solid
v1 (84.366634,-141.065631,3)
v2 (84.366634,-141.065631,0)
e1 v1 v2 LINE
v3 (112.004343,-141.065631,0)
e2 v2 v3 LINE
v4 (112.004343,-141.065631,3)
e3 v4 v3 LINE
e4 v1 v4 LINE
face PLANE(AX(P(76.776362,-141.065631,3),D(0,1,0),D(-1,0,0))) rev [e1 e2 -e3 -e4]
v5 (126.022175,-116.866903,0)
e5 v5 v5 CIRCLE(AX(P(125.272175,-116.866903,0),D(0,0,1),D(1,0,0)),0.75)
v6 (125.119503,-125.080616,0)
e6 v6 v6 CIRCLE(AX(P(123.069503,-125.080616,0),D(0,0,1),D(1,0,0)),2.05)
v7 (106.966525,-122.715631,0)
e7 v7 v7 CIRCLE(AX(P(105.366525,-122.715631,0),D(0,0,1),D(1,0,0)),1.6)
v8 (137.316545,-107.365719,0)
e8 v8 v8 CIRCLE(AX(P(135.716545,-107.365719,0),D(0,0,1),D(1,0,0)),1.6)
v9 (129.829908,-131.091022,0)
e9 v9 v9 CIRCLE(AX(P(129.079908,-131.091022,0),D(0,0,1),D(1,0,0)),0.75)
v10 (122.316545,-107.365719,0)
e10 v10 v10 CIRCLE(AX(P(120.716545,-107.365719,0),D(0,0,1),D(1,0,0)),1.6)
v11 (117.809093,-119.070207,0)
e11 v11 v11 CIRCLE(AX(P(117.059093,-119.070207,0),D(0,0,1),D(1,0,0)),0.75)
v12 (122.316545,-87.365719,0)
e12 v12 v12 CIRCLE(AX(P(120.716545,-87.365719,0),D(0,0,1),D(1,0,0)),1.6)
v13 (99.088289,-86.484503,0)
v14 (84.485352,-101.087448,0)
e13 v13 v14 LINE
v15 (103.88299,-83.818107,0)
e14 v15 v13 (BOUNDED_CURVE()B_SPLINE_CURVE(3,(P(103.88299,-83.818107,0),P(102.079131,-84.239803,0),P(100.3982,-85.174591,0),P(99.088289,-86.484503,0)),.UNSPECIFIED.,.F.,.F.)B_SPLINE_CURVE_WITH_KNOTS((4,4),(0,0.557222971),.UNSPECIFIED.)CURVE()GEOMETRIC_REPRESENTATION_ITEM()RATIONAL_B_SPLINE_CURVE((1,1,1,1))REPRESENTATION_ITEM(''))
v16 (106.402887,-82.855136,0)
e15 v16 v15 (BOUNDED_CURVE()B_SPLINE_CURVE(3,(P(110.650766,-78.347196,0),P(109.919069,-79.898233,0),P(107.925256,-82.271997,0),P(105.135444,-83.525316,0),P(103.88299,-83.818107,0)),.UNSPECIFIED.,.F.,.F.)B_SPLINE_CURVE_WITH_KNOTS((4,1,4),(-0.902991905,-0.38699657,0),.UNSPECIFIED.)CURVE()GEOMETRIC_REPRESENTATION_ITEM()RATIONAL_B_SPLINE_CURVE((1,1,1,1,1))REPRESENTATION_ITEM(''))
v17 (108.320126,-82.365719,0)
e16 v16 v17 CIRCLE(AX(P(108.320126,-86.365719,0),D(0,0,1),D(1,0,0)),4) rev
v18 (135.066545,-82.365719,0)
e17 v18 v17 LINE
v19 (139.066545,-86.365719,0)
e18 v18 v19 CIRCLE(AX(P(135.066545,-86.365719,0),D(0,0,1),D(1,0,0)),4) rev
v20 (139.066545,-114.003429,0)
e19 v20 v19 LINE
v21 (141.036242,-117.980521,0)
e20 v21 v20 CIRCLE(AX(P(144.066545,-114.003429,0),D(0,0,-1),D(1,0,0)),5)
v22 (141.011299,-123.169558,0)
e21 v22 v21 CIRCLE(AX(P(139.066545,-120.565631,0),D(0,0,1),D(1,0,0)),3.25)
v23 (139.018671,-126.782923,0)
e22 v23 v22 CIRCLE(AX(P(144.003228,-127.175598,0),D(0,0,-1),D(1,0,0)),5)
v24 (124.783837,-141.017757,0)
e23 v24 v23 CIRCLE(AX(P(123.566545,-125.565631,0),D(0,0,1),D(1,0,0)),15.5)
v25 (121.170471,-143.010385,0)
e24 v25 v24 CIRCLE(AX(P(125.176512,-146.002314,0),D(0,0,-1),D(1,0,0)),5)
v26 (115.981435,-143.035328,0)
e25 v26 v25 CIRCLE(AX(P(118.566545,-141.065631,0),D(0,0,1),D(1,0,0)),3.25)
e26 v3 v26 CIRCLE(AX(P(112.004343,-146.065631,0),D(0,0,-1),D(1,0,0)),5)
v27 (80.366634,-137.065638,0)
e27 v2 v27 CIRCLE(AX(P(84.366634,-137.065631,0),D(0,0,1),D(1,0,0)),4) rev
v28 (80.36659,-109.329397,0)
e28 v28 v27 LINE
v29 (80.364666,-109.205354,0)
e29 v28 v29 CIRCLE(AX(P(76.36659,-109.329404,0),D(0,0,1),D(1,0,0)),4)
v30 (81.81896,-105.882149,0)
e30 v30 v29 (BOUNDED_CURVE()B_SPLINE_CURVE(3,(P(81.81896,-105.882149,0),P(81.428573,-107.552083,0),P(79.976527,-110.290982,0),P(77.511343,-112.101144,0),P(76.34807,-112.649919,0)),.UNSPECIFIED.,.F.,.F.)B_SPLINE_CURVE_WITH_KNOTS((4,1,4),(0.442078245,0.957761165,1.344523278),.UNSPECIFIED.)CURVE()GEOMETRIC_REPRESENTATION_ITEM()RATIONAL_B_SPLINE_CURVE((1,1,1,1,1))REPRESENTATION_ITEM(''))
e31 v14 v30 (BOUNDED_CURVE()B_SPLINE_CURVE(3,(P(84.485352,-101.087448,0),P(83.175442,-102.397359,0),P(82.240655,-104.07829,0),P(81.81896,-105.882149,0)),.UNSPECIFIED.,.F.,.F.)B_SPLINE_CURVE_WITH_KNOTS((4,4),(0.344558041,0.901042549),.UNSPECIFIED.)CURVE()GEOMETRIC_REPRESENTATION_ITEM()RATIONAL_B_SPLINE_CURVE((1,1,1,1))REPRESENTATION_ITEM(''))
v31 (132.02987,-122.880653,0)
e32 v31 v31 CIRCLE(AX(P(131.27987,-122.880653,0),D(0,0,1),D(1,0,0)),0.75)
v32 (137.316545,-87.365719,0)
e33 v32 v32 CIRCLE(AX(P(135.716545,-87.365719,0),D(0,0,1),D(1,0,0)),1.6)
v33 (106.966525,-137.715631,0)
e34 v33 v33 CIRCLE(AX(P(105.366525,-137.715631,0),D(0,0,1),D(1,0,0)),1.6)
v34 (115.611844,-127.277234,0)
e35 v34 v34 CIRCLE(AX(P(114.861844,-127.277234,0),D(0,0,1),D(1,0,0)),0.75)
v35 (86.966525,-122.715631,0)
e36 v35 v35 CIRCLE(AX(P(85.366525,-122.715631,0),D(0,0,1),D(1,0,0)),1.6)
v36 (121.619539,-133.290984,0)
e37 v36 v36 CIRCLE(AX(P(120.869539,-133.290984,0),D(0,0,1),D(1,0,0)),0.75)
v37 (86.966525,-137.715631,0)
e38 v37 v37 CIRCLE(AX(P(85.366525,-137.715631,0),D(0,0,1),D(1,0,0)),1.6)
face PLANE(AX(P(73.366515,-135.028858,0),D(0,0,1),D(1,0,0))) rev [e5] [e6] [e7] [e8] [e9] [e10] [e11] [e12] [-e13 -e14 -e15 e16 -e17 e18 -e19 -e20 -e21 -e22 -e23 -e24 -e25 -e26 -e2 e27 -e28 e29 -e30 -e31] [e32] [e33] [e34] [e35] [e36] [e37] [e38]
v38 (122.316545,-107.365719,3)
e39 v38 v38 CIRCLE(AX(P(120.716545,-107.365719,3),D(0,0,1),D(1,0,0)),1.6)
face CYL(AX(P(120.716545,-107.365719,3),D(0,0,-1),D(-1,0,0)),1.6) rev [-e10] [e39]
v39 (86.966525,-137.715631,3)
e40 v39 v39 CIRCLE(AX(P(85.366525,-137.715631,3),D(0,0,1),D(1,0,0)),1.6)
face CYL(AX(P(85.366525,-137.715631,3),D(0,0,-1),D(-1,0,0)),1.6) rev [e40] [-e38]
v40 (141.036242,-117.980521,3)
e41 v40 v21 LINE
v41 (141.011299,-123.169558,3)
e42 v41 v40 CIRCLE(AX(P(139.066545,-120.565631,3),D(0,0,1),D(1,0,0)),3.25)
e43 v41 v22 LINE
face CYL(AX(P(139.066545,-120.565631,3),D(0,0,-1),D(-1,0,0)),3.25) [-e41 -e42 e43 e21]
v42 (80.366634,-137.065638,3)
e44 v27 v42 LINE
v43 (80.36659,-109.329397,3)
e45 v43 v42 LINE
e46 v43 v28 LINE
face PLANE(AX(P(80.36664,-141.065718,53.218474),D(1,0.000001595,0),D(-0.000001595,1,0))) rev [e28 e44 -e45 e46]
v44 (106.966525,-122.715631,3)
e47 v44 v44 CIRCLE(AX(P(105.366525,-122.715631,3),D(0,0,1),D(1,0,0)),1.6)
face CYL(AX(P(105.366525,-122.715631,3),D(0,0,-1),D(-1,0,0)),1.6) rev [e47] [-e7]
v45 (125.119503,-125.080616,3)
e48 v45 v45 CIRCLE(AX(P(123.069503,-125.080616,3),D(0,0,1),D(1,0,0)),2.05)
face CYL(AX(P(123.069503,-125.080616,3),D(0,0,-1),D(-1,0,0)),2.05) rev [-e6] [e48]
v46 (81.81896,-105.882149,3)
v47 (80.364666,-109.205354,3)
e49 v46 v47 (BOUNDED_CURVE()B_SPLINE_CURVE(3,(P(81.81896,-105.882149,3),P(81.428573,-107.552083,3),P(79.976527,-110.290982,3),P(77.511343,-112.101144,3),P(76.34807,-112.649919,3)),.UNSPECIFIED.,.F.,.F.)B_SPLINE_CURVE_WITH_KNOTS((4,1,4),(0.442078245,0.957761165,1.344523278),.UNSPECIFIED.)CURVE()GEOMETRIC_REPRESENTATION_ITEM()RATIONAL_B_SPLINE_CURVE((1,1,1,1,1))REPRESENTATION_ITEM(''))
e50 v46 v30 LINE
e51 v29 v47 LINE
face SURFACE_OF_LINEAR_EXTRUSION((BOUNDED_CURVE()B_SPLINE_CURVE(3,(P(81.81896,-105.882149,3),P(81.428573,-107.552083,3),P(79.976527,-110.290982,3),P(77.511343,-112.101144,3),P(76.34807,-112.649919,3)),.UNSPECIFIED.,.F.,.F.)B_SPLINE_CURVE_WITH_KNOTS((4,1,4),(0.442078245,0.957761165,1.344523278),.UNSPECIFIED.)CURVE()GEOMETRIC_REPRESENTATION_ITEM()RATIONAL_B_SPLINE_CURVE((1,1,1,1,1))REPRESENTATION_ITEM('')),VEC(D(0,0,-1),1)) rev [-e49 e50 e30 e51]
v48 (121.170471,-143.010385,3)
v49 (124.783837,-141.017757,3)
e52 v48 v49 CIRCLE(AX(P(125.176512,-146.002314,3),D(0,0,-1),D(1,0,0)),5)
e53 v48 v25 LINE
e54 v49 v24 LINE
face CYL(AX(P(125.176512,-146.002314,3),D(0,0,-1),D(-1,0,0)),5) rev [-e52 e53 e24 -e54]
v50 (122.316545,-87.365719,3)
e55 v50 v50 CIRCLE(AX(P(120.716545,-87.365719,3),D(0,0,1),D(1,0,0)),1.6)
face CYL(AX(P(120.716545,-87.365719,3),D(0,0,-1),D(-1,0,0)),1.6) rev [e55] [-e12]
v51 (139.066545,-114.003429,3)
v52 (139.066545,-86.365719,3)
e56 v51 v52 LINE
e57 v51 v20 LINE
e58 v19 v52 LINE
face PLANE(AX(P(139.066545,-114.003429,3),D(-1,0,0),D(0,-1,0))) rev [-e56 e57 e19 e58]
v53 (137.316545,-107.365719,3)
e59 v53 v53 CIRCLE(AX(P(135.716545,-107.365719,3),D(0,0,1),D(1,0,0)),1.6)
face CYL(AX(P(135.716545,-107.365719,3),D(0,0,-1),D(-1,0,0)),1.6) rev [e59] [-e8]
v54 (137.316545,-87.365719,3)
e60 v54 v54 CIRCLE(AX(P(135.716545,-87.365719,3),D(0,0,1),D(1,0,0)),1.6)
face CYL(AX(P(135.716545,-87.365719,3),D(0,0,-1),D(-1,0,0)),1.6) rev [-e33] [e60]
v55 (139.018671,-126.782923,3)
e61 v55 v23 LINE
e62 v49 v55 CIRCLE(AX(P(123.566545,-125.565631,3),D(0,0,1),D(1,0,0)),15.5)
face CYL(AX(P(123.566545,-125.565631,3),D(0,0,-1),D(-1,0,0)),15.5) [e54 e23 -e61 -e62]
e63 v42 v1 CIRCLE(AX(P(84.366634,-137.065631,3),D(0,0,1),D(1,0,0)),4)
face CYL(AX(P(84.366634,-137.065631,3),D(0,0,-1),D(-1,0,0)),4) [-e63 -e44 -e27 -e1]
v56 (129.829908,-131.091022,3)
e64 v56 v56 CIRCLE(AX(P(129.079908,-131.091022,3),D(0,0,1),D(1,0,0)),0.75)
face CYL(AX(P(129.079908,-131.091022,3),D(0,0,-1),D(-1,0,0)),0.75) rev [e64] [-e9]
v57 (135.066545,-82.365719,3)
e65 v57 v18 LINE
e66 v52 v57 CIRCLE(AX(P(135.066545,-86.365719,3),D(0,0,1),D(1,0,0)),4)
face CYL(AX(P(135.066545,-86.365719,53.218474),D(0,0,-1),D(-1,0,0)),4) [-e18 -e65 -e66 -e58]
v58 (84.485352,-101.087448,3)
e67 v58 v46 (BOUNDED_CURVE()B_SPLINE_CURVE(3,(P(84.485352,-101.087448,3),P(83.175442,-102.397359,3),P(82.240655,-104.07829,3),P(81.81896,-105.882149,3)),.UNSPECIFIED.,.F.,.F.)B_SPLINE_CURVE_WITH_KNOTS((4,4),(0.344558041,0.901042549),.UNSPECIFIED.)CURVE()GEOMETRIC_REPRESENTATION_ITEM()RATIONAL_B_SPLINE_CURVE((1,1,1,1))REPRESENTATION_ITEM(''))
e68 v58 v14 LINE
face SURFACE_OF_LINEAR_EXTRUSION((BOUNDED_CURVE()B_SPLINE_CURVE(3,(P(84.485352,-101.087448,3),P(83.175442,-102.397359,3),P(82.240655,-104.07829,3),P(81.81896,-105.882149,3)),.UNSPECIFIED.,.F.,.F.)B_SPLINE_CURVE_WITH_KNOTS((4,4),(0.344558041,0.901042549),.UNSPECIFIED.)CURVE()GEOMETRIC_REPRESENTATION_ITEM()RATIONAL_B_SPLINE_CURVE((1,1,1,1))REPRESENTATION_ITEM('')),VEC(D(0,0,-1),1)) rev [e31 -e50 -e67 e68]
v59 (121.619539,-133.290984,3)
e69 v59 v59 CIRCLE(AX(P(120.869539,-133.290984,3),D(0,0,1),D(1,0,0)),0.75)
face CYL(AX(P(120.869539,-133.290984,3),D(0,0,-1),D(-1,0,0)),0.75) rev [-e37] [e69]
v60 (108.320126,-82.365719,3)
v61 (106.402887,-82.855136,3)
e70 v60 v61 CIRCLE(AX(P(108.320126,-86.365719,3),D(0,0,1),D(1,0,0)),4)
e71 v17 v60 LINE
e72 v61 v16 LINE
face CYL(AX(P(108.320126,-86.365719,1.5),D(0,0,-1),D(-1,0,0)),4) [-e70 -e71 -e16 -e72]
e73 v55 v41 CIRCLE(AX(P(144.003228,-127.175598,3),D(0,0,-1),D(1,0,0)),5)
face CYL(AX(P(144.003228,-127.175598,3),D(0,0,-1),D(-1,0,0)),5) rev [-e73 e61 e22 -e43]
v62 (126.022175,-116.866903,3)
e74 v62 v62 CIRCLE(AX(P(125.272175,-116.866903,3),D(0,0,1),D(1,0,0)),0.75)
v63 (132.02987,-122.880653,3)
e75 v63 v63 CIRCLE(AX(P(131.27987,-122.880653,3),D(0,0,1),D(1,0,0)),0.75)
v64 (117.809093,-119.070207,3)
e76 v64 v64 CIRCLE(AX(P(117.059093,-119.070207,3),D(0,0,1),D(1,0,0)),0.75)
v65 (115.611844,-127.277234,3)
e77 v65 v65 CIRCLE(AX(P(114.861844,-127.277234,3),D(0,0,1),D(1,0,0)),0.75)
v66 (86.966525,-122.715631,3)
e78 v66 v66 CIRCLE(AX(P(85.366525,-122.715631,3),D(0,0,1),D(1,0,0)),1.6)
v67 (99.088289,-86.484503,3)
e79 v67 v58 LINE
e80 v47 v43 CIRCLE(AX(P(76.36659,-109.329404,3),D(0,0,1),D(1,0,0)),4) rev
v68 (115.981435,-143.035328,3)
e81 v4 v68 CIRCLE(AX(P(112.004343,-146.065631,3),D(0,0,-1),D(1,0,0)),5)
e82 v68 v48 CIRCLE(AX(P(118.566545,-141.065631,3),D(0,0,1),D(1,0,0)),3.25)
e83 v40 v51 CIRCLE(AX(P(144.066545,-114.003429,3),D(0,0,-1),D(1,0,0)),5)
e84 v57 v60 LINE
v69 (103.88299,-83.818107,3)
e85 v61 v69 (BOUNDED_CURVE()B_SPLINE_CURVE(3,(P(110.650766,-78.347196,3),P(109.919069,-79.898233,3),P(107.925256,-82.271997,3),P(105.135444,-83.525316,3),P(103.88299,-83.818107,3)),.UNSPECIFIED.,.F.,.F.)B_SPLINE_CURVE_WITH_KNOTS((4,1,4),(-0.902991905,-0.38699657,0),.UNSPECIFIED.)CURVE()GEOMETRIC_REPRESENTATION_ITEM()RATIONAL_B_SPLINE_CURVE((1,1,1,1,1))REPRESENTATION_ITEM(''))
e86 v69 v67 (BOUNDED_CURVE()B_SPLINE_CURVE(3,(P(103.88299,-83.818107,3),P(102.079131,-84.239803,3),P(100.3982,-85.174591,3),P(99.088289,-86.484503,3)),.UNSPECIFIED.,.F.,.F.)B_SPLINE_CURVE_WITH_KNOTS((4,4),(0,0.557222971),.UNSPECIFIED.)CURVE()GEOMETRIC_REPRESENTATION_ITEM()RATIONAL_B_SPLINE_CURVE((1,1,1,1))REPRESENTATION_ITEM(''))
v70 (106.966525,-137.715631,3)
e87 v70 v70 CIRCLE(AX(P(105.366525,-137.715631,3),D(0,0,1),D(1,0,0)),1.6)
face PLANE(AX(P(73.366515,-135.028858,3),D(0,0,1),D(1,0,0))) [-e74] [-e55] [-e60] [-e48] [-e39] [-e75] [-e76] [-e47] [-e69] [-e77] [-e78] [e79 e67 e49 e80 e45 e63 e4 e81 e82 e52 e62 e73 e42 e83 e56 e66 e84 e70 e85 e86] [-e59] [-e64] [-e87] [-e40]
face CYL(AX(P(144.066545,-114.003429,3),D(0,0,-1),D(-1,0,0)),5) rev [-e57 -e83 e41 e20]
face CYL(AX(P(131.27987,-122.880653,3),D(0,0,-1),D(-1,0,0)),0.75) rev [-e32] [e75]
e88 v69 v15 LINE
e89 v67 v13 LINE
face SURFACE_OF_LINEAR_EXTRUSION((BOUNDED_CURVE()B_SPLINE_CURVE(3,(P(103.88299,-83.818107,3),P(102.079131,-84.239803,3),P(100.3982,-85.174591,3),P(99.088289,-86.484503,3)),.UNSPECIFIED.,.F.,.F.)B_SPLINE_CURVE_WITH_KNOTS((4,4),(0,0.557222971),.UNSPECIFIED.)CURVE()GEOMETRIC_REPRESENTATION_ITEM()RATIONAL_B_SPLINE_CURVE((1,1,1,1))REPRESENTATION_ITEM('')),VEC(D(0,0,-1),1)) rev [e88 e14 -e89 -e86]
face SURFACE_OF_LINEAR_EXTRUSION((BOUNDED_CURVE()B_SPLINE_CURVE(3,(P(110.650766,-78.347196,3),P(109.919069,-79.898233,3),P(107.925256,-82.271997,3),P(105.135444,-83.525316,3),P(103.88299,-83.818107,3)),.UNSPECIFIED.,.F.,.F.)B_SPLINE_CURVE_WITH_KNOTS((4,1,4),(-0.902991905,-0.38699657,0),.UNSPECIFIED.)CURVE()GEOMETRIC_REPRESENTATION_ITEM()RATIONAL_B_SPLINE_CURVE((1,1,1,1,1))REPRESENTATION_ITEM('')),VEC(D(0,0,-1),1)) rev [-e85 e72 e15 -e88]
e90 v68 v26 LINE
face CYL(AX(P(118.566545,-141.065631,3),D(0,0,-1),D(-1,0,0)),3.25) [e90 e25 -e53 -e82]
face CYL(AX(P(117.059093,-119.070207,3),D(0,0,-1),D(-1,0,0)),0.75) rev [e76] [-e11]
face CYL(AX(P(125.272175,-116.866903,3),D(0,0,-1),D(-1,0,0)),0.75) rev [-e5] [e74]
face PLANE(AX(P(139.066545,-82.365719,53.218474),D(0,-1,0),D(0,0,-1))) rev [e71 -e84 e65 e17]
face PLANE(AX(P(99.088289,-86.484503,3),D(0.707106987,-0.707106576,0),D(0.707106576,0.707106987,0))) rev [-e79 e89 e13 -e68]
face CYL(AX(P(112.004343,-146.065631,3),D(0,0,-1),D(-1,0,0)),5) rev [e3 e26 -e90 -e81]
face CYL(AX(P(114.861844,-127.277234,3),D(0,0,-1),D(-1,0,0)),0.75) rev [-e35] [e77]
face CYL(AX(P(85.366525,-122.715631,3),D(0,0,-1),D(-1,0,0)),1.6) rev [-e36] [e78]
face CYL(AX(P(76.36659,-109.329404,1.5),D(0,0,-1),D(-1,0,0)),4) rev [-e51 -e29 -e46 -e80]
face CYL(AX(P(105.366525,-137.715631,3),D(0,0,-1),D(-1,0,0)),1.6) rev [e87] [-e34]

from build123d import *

# Parameters (mm, degrees)
SKETCH1_R           = 0.75
SKETCH1_R_2         = 2.05
SKETCH1_R_3         = 1.6
BOSS_EXTRUDE1_DEPTH = 3
CUT_EXTRUDE2_DEPTH  = 3
FILLET1_START       = -1
FILLET1_DEPTH       = 5
FILLET1_2_DEPTH     = 3


with BuildPart() as part:
    # Sketch1 → Boss-Extrude1 (new body)
    with BuildSketch(Plane.XY):
        with BuildLine():
            Line((76.776362435, -141.065631197), (112.004342533, -141.065631197))
            ThreePointArc((112.004342533, -141.065631197), (114.223405945, -141.585033293), (115.981434881, -143.035328167))
            ThreePointArc((115.981434881, -143.035328167), (118.582167111, -144.31559365), (121.170471257, -143.010385054))
            ThreePointArc((121.170471257, -143.010385054), (122.762010679, -141.623937155), (124.783836945, -141.017757268))
            ThreePointArc((124.783836945, -141.017757268), (134.526700016, -136.525786306), (139.018670978, -126.782923235))
            ThreePointArc((139.018670978, -126.782923235), (139.624850866, -124.761096969), (141.011298764, -123.169557547))
            ThreePointArc((141.011298764, -123.169557547), (142.31650736, -120.5812534), (141.036241877, -117.980521171))
            ThreePointArc((141.036241877, -117.980521171), (139.585947004, -116.222492234), (139.066544907, -114.003428823))
            Line((139.066544907, -114.003428823), (139.066544907, -78.7754981))
            ThreePointArc((139.066544907, -78.7754981), (141.336583349, -75.865660283), (139.066544907, -72.955822465))
            ThreePointArc((139.066544907, -72.955822465), (136.675727861, -69.984491924), (133.029767481, -68.865660283))
            Line((133.029767481, -68.865660283), (117.643399217, -68.865660283))
            ThreePointArc((117.643399217, -68.865660283), (113.997438837, -69.984491924), (111.60662179, -72.955822465))
            ThreePointArc((111.60662179, -72.955822465), (109.382649666, -75.341946816), (110.650765895, -78.347196))
            add(Edge.make_bspline(
                [(110.650765895, -78.347196), (109.91906925, -79.898232812), (107.925256124, -82.271997183), (105.135443821, -83.525315829), (103.882990325, -83.818107321)],
                knots=[-0.902991905, -0.902991905, -0.902991905, -0.902991905, -0.38699657, 0, 0, 0, 0], degree=3, weights=[1, 1, 1, 1, 1]))
            add(Edge.make_bspline(
                [(103.882990325, -83.818107321), (102.079131121, -84.239803321), (100.398199973, -85.1745908), (99.088288993, -86.484502541)],
                knots=[0, 0, 0, 0, 0.557222971, 0.557222971, 0.557222971, 0.557222971], degree=3, weights=[1, 1, 1, 1]))
            Line((99.088288993, -86.484502541), (84.485352307, -101.08744771))
            add(Edge.make_bspline(
                [(84.485352307, -101.08744771), (83.175441742, -102.397359036), (82.240655409, -104.078290075), (81.818960273, -105.882148879)],
                knots=[0.344558041, 0.344558041, 0.344558041, 0.344558041, 0.901042549, 0.901042549, 0.901042549, 0.901042549], degree=3, weights=[1, 1, 1, 1]))
            add(Edge.make_bspline(
                [(81.818960273, -105.882148879), (81.428573164, -107.552083308), (79.976526739, -110.290981661), (77.511343468, -112.101144248), (76.34806998, -112.649918673)],
                knots=[0.442078245, 0.442078245, 0.442078245, 0.442078245, 0.957761165, 1.344523278, 1.344523278, 1.344523278, 1.344523278], degree=3, weights=[1, 1, 1, 1, 1]))
            ThreePointArc((76.34806998, -112.649918673), (73.342799133, -111.381774562), (70.956667683, -113.605784292))
            ThreePointArc((70.956667683, -113.605784292), (67.985343813, -115.996601782), (66.866515059, -119.642557902))
            Line((66.866515059, -119.642557902), (66.866515059, -135.028857587))
            ThreePointArc((66.866515059, -135.028857587), (67.985343813, -138.674813706), (70.956667683, -141.065631197))
            ThreePointArc((70.956667683, -141.065631197), (73.866515059, -143.335707744), (76.776362435, -141.065631197))
        make_face()
        with Locations((129.079908052, -131.091021895)):
            Circle(SKETCH1_R, mode=Mode.SUBTRACT)
        with Locations((120.86953867, -133.290983741)):
            Circle(SKETCH1_R, mode=Mode.SUBTRACT)
        with Locations((114.861843981, -127.277234232)):
            Circle(SKETCH1_R, mode=Mode.SUBTRACT)
        with Locations((117.059092978, -119.070206821)):
            Circle(SKETCH1_R, mode=Mode.SUBTRACT)
        with Locations((125.27217521, -116.866903003)):
            Circle(SKETCH1_R, mode=Mode.SUBTRACT)
        with Locations((123.069502622, -125.080616499)):
            Circle(SKETCH1_R_2, mode=Mode.SUBTRACT)
        with Locations((131.279869898, -122.880652512)):
            Circle(SKETCH1_R, mode=Mode.SUBTRACT)
        with Locations((85.366524977, -122.715631197)):
            Circle(SKETCH1_R_3, mode=Mode.SUBTRACT)
        with Locations((85.366524977, -137.715631197)):
            Circle(SKETCH1_R_3, mode=Mode.SUBTRACT)
        with Locations((105.366524977, -137.715631197)):
            Circle(SKETCH1_R_3, mode=Mode.SUBTRACT)
        with Locations((105.366524977, -122.715631197)):
            Circle(SKETCH1_R_3, mode=Mode.SUBTRACT)
        with Locations((135.716544907, -87.365719383)):
            Circle(SKETCH1_R_3, mode=Mode.SUBTRACT)
        with Locations((120.716544907, -87.365719383)):
            Circle(SKETCH1_R_3, mode=Mode.SUBTRACT)
        with Locations((120.716544907, -107.365719383)):
            Circle(SKETCH1_R_3, mode=Mode.SUBTRACT)
        with Locations((135.716544907, -107.365719383)):
            Circle(SKETCH1_R_3, mode=Mode.SUBTRACT)
    extrude(amount=BOSS_EXTRUDE1_DEPTH)

    # Sketch2 → Cut-Extrude2 (cut)
    with BuildSketch(Plane(origin=(0, 0, 0), x_dir=(-1, 0, 0), z_dir=(0, 0, -1))):
        Polygon((-139.066544907, -82.365719383), (-107.206390326, -82.365719383), (-105.489345494, -66.543961021), (-134.526700016, -61.302844114), (-151.077173689, -66.543961021), align=None)
        Polygon((-64.544828407, -107.48854343), (-80.366589508, -109.20556302), (-80.366640336, -141.065717602), (-64.544901135, -153.076371625), (-59.303757824, -136.525906313), align=None)
    extrude(amount=-CUT_EXTRUDE2_DEPTH, mode=Mode.SUBTRACT)

    # Fillet1: read off the stored shape, not the designer's step
    # Fillet1 outline → Fillet1 (cut)
    with BuildSketch(Plane.XY.offset(FILLET1_START)):
        with BuildLine():
            Line((80.366640336, -141.065631197), (84.366633955, -141.065631197))
            ThreePointArc((84.366633955, -141.065631197), (81.538209086, -139.894060578), (80.366633955, -137.065637579))
            Line((80.366633955, -137.065637579), (80.366640336, -141.065631197))
        make_face()
        with BuildLine():
            add(Edge.make_bspline(
                [(107.206390326, -82.365719383), (106.946532094, -82.541418076), (106.678265015, -82.704743583), (106.402886758, -82.855136258)],
                knots=[-0.365754194, -0.365754194, -0.365754194, -0.365754194, -0.271346383, -0.271346383, -0.271346383, -0.271346383], degree=3))
            ThreePointArc((106.402886758, -82.855136258), (107.330765678, -82.490004449), (108.320125951, -82.365719383))
            Line((108.320125951, -82.365719383), (107.206390326, -82.365719383))
        make_face()
        with BuildLine():
            Line((139.066544907, -82.365719383), (135.066544907, -82.365719383))
            ThreePointArc((135.066544907, -82.365719383), (137.894972032, -83.537292258), (139.066544907, -86.365719383))
            Line((139.066544907, -86.365719383), (139.066544907, -82.365719383))
        make_face()
    extrude(amount=FILLET1_DEPTH, mode=Mode.SUBTRACT)

    # Fillet1 2 outline → Fillet1 2 (add)
    with BuildSketch(Plane.XY):
        with BuildLine():
            ThreePointArc((80.364665709, -109.205354245), (80.366108628, -109.267368328), (80.366589705, -109.329397329))
            Line((80.366589705, -109.329397329), (80.366589508, -109.20556302))
            Line((80.366589508, -109.20556302), (80.364665709, -109.205354245))
        make_face()
    extrude(amount=FILLET1_2_DEPTH)


solid = part.part
